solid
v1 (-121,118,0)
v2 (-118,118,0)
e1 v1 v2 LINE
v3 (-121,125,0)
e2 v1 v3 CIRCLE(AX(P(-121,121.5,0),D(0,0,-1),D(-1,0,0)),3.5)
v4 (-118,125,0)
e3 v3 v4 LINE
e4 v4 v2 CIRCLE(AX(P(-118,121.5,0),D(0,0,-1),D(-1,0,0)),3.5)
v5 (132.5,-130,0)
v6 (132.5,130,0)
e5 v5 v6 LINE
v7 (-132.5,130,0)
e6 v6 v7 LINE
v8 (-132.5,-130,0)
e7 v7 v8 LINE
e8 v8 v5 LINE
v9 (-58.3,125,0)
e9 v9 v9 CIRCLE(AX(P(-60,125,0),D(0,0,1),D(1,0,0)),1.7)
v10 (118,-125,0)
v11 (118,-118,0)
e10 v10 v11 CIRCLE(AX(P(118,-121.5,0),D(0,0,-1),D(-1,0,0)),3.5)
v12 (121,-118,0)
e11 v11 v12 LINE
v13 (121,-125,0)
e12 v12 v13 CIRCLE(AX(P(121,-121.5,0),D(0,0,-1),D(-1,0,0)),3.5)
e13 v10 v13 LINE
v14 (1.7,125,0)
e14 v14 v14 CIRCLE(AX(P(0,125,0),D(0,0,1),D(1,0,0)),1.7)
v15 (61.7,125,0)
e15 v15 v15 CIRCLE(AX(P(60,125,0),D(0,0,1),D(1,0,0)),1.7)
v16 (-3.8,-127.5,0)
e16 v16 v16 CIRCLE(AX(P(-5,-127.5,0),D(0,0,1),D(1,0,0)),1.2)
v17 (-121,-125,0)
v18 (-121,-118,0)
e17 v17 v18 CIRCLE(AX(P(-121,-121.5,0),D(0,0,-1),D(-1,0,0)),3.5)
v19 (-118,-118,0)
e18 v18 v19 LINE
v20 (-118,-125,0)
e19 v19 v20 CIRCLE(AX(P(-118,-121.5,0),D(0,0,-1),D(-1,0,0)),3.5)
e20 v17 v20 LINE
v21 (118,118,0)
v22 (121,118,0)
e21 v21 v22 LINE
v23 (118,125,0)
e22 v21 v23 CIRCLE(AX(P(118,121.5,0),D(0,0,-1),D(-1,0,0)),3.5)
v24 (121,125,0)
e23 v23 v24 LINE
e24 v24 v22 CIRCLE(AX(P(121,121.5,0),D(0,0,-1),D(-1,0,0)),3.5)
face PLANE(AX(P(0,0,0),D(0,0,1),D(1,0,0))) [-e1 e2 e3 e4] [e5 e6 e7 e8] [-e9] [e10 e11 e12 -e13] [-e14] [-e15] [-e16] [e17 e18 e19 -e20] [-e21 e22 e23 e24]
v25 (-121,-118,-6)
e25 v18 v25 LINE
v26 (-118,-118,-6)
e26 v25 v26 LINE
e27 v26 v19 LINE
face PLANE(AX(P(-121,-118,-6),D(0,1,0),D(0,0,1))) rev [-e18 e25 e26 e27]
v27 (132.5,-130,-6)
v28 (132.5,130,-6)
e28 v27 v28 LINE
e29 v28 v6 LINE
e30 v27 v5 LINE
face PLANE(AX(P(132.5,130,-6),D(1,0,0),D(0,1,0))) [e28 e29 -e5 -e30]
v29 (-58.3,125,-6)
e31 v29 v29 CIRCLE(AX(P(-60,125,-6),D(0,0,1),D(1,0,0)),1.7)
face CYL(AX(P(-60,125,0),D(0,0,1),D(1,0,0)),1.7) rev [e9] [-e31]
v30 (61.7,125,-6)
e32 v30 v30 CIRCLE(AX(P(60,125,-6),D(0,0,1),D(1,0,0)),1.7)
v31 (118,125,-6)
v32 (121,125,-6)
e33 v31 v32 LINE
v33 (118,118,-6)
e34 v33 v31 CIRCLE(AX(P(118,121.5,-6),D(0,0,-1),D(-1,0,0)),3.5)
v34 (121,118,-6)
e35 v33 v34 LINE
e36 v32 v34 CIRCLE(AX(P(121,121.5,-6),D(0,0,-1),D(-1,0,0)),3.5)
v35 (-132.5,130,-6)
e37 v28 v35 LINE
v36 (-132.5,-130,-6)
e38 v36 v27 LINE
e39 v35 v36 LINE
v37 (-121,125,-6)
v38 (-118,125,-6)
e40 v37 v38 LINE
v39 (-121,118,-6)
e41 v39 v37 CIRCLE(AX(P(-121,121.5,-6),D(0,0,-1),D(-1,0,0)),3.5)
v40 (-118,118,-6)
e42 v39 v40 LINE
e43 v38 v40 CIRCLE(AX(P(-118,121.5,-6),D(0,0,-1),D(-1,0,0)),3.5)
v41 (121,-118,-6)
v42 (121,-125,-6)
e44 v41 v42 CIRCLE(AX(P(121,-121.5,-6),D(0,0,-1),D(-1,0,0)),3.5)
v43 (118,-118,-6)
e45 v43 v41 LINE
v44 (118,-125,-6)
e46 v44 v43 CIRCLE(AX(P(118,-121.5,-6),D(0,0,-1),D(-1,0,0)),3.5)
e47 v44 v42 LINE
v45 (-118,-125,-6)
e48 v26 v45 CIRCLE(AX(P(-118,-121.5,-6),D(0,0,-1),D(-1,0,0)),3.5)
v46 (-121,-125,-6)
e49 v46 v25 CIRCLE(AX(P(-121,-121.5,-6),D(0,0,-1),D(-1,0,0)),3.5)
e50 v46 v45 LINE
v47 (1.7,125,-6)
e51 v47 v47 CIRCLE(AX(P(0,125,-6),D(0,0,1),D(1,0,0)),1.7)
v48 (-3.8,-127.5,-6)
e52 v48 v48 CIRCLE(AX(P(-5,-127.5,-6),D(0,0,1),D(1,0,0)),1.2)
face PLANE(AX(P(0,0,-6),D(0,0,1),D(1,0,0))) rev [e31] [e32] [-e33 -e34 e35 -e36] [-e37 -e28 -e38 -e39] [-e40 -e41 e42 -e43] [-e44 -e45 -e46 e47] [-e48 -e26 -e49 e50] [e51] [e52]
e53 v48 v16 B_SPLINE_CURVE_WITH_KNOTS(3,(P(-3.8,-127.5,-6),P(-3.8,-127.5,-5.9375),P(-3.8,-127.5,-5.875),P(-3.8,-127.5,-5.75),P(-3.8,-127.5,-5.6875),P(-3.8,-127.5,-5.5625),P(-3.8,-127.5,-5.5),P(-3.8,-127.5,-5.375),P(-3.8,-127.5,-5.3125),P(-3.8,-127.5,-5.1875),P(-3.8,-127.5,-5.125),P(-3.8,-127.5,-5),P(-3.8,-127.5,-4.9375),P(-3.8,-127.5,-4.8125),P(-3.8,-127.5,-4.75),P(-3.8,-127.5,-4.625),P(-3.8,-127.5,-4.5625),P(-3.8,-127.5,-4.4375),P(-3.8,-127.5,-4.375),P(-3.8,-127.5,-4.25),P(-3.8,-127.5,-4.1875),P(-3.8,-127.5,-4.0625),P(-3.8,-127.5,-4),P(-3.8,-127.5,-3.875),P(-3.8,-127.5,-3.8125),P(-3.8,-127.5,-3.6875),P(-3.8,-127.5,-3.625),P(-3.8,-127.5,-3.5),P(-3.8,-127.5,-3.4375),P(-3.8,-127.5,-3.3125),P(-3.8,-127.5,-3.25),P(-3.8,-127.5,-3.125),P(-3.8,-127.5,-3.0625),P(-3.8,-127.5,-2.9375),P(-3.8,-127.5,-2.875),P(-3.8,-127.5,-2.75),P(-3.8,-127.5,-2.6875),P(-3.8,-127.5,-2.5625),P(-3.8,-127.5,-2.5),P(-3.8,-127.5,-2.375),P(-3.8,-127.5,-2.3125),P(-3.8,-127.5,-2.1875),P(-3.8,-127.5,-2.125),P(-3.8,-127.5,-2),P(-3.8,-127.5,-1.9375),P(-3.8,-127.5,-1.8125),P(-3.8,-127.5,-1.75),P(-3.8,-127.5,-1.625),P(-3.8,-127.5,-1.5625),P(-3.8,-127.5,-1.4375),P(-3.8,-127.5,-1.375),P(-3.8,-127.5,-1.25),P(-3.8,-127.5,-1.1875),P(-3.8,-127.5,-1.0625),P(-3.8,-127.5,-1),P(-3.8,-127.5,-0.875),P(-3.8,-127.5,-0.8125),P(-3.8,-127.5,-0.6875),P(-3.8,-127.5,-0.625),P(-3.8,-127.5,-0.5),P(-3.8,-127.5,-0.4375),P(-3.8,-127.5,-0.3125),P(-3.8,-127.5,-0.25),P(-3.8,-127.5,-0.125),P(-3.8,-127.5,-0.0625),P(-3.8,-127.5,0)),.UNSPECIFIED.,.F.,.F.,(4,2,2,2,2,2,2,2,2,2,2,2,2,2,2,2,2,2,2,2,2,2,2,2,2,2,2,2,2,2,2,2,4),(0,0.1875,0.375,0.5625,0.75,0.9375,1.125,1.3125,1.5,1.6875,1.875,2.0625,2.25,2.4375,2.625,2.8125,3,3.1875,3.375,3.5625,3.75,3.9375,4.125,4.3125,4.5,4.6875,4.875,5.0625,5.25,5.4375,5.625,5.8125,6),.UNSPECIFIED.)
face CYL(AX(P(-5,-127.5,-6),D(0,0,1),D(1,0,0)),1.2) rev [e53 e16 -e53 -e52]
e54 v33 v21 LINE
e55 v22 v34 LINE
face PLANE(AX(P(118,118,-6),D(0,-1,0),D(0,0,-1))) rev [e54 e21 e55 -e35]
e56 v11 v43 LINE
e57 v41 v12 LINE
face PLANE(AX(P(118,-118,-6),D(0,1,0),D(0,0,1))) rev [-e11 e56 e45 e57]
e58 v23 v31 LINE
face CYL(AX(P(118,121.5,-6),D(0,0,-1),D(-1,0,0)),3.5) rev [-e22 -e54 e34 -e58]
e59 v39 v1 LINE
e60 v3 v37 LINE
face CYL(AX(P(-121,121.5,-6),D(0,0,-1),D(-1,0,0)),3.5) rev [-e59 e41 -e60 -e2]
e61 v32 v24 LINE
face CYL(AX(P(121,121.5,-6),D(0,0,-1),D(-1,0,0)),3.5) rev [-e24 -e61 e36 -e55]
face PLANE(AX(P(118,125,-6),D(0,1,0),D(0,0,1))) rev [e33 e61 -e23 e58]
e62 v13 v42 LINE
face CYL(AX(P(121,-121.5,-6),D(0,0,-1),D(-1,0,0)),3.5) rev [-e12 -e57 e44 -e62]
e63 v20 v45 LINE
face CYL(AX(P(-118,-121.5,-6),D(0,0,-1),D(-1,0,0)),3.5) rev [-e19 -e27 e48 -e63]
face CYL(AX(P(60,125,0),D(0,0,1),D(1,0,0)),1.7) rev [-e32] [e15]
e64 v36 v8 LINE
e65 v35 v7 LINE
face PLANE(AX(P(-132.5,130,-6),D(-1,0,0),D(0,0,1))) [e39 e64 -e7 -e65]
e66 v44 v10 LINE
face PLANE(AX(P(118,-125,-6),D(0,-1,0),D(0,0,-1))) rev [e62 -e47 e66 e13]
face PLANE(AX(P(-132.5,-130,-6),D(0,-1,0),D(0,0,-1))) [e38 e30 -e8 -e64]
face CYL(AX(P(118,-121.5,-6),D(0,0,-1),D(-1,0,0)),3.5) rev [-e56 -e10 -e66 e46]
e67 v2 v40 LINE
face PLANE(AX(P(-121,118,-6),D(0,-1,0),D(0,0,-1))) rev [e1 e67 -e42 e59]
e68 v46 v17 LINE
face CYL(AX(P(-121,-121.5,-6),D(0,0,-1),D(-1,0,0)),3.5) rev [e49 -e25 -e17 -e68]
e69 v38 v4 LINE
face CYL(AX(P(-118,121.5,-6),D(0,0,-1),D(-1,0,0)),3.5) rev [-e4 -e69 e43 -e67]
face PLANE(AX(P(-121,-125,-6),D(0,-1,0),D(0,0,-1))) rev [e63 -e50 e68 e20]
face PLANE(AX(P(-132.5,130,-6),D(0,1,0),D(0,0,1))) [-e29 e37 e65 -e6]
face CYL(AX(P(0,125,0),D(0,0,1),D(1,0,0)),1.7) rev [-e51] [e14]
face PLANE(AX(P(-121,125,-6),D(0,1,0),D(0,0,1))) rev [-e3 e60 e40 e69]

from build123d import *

# Parameters (mm, degrees)
CROQUIS1_W                      = 265
CROQUIS1_H                      = 260
BRIDA_BASE1_DEPTH               = 6
RANURA_START                    = -6
RANURA_DE_MARGEN_PARA_M61_DEPTH = 6
CROQUIS5_R                      = 1.2
CORTAR_EXTRUIR1_DEPTH           = 186.72089274
TALADRO_DE_MARGEN_PARA_M31_D    = 3.4


# Read off the part's stored shape, not the designer's step: Ranura de margen para M61
# Sheet-metal steps are written as plain solids
with BuildPart() as part:
    # Croquis1 → Brida base1 (new body)
    with BuildSketch(Plane.XY):
        Rectangle(CROQUIS1_W, CROQUIS1_H)
    extrude(amount=-BRIDA_BASE1_DEPTH)

    # Ranura de margen para M61 outline → Ranura de margen para M61 (cut)
    with BuildSketch(Plane.XY.offset(RANURA_START)):
        with BuildLine():
            ThreePointArc((-118, 118), (-114.5, 121.5), (-118, 125))
            Line((-118, 125), (-121, 125))
            ThreePointArc((-121, 125), (-124.5, 121.5), (-121, 118))
            Line((-121, 118), (-118, 118))
        make_face()
        with BuildLine():
            ThreePointArc((118, 125), (114.5, 121.5), (118, 118))
            Line((118, 118), (121, 118))
            ThreePointArc((121, 118), (124.5, 121.5), (121, 125))
            Line((121, 125), (118, 125))
        make_face()
        with BuildLine():
            ThreePointArc((121, -125), (124.5, -121.5), (121, -118))
            Line((121, -118), (118, -118))
            ThreePointArc((118, -118), (114.5, -121.5), (118, -125))
            Line((118, -125), (121, -125))
        make_face()
        with BuildLine():
            ThreePointArc((-121, -118), (-124.5, -121.5), (-121, -125))
            Line((-121, -125), (-118, -125))
            ThreePointArc((-118, -125), (-114.5, -121.5), (-118, -118))
            Line((-118, -118), (-121, -118))
        make_face()
    extrude(amount=RANURA_DE_MARGEN_PARA_M61_DEPTH, mode=Mode.SUBTRACT)

    # Croquis5 → Cortar-Extruir1 (cut, through all)
    with BuildSketch(Plane.XY):
        with Locations((-5, -127.5)):
            Circle(CROQUIS5_R)
    extrude(amount=-CORTAR_EXTRUIR1_DEPTH, mode=Mode.SUBTRACT)

    # Taladro de margen para M31 (through all)
    with Locations(Plane.XY):
        with Locations((60, 125), (0, 125), (-60, 125)):
            Hole(TALADRO_DE_MARGEN_PARA_M31_D / 2)


solid = part.part
